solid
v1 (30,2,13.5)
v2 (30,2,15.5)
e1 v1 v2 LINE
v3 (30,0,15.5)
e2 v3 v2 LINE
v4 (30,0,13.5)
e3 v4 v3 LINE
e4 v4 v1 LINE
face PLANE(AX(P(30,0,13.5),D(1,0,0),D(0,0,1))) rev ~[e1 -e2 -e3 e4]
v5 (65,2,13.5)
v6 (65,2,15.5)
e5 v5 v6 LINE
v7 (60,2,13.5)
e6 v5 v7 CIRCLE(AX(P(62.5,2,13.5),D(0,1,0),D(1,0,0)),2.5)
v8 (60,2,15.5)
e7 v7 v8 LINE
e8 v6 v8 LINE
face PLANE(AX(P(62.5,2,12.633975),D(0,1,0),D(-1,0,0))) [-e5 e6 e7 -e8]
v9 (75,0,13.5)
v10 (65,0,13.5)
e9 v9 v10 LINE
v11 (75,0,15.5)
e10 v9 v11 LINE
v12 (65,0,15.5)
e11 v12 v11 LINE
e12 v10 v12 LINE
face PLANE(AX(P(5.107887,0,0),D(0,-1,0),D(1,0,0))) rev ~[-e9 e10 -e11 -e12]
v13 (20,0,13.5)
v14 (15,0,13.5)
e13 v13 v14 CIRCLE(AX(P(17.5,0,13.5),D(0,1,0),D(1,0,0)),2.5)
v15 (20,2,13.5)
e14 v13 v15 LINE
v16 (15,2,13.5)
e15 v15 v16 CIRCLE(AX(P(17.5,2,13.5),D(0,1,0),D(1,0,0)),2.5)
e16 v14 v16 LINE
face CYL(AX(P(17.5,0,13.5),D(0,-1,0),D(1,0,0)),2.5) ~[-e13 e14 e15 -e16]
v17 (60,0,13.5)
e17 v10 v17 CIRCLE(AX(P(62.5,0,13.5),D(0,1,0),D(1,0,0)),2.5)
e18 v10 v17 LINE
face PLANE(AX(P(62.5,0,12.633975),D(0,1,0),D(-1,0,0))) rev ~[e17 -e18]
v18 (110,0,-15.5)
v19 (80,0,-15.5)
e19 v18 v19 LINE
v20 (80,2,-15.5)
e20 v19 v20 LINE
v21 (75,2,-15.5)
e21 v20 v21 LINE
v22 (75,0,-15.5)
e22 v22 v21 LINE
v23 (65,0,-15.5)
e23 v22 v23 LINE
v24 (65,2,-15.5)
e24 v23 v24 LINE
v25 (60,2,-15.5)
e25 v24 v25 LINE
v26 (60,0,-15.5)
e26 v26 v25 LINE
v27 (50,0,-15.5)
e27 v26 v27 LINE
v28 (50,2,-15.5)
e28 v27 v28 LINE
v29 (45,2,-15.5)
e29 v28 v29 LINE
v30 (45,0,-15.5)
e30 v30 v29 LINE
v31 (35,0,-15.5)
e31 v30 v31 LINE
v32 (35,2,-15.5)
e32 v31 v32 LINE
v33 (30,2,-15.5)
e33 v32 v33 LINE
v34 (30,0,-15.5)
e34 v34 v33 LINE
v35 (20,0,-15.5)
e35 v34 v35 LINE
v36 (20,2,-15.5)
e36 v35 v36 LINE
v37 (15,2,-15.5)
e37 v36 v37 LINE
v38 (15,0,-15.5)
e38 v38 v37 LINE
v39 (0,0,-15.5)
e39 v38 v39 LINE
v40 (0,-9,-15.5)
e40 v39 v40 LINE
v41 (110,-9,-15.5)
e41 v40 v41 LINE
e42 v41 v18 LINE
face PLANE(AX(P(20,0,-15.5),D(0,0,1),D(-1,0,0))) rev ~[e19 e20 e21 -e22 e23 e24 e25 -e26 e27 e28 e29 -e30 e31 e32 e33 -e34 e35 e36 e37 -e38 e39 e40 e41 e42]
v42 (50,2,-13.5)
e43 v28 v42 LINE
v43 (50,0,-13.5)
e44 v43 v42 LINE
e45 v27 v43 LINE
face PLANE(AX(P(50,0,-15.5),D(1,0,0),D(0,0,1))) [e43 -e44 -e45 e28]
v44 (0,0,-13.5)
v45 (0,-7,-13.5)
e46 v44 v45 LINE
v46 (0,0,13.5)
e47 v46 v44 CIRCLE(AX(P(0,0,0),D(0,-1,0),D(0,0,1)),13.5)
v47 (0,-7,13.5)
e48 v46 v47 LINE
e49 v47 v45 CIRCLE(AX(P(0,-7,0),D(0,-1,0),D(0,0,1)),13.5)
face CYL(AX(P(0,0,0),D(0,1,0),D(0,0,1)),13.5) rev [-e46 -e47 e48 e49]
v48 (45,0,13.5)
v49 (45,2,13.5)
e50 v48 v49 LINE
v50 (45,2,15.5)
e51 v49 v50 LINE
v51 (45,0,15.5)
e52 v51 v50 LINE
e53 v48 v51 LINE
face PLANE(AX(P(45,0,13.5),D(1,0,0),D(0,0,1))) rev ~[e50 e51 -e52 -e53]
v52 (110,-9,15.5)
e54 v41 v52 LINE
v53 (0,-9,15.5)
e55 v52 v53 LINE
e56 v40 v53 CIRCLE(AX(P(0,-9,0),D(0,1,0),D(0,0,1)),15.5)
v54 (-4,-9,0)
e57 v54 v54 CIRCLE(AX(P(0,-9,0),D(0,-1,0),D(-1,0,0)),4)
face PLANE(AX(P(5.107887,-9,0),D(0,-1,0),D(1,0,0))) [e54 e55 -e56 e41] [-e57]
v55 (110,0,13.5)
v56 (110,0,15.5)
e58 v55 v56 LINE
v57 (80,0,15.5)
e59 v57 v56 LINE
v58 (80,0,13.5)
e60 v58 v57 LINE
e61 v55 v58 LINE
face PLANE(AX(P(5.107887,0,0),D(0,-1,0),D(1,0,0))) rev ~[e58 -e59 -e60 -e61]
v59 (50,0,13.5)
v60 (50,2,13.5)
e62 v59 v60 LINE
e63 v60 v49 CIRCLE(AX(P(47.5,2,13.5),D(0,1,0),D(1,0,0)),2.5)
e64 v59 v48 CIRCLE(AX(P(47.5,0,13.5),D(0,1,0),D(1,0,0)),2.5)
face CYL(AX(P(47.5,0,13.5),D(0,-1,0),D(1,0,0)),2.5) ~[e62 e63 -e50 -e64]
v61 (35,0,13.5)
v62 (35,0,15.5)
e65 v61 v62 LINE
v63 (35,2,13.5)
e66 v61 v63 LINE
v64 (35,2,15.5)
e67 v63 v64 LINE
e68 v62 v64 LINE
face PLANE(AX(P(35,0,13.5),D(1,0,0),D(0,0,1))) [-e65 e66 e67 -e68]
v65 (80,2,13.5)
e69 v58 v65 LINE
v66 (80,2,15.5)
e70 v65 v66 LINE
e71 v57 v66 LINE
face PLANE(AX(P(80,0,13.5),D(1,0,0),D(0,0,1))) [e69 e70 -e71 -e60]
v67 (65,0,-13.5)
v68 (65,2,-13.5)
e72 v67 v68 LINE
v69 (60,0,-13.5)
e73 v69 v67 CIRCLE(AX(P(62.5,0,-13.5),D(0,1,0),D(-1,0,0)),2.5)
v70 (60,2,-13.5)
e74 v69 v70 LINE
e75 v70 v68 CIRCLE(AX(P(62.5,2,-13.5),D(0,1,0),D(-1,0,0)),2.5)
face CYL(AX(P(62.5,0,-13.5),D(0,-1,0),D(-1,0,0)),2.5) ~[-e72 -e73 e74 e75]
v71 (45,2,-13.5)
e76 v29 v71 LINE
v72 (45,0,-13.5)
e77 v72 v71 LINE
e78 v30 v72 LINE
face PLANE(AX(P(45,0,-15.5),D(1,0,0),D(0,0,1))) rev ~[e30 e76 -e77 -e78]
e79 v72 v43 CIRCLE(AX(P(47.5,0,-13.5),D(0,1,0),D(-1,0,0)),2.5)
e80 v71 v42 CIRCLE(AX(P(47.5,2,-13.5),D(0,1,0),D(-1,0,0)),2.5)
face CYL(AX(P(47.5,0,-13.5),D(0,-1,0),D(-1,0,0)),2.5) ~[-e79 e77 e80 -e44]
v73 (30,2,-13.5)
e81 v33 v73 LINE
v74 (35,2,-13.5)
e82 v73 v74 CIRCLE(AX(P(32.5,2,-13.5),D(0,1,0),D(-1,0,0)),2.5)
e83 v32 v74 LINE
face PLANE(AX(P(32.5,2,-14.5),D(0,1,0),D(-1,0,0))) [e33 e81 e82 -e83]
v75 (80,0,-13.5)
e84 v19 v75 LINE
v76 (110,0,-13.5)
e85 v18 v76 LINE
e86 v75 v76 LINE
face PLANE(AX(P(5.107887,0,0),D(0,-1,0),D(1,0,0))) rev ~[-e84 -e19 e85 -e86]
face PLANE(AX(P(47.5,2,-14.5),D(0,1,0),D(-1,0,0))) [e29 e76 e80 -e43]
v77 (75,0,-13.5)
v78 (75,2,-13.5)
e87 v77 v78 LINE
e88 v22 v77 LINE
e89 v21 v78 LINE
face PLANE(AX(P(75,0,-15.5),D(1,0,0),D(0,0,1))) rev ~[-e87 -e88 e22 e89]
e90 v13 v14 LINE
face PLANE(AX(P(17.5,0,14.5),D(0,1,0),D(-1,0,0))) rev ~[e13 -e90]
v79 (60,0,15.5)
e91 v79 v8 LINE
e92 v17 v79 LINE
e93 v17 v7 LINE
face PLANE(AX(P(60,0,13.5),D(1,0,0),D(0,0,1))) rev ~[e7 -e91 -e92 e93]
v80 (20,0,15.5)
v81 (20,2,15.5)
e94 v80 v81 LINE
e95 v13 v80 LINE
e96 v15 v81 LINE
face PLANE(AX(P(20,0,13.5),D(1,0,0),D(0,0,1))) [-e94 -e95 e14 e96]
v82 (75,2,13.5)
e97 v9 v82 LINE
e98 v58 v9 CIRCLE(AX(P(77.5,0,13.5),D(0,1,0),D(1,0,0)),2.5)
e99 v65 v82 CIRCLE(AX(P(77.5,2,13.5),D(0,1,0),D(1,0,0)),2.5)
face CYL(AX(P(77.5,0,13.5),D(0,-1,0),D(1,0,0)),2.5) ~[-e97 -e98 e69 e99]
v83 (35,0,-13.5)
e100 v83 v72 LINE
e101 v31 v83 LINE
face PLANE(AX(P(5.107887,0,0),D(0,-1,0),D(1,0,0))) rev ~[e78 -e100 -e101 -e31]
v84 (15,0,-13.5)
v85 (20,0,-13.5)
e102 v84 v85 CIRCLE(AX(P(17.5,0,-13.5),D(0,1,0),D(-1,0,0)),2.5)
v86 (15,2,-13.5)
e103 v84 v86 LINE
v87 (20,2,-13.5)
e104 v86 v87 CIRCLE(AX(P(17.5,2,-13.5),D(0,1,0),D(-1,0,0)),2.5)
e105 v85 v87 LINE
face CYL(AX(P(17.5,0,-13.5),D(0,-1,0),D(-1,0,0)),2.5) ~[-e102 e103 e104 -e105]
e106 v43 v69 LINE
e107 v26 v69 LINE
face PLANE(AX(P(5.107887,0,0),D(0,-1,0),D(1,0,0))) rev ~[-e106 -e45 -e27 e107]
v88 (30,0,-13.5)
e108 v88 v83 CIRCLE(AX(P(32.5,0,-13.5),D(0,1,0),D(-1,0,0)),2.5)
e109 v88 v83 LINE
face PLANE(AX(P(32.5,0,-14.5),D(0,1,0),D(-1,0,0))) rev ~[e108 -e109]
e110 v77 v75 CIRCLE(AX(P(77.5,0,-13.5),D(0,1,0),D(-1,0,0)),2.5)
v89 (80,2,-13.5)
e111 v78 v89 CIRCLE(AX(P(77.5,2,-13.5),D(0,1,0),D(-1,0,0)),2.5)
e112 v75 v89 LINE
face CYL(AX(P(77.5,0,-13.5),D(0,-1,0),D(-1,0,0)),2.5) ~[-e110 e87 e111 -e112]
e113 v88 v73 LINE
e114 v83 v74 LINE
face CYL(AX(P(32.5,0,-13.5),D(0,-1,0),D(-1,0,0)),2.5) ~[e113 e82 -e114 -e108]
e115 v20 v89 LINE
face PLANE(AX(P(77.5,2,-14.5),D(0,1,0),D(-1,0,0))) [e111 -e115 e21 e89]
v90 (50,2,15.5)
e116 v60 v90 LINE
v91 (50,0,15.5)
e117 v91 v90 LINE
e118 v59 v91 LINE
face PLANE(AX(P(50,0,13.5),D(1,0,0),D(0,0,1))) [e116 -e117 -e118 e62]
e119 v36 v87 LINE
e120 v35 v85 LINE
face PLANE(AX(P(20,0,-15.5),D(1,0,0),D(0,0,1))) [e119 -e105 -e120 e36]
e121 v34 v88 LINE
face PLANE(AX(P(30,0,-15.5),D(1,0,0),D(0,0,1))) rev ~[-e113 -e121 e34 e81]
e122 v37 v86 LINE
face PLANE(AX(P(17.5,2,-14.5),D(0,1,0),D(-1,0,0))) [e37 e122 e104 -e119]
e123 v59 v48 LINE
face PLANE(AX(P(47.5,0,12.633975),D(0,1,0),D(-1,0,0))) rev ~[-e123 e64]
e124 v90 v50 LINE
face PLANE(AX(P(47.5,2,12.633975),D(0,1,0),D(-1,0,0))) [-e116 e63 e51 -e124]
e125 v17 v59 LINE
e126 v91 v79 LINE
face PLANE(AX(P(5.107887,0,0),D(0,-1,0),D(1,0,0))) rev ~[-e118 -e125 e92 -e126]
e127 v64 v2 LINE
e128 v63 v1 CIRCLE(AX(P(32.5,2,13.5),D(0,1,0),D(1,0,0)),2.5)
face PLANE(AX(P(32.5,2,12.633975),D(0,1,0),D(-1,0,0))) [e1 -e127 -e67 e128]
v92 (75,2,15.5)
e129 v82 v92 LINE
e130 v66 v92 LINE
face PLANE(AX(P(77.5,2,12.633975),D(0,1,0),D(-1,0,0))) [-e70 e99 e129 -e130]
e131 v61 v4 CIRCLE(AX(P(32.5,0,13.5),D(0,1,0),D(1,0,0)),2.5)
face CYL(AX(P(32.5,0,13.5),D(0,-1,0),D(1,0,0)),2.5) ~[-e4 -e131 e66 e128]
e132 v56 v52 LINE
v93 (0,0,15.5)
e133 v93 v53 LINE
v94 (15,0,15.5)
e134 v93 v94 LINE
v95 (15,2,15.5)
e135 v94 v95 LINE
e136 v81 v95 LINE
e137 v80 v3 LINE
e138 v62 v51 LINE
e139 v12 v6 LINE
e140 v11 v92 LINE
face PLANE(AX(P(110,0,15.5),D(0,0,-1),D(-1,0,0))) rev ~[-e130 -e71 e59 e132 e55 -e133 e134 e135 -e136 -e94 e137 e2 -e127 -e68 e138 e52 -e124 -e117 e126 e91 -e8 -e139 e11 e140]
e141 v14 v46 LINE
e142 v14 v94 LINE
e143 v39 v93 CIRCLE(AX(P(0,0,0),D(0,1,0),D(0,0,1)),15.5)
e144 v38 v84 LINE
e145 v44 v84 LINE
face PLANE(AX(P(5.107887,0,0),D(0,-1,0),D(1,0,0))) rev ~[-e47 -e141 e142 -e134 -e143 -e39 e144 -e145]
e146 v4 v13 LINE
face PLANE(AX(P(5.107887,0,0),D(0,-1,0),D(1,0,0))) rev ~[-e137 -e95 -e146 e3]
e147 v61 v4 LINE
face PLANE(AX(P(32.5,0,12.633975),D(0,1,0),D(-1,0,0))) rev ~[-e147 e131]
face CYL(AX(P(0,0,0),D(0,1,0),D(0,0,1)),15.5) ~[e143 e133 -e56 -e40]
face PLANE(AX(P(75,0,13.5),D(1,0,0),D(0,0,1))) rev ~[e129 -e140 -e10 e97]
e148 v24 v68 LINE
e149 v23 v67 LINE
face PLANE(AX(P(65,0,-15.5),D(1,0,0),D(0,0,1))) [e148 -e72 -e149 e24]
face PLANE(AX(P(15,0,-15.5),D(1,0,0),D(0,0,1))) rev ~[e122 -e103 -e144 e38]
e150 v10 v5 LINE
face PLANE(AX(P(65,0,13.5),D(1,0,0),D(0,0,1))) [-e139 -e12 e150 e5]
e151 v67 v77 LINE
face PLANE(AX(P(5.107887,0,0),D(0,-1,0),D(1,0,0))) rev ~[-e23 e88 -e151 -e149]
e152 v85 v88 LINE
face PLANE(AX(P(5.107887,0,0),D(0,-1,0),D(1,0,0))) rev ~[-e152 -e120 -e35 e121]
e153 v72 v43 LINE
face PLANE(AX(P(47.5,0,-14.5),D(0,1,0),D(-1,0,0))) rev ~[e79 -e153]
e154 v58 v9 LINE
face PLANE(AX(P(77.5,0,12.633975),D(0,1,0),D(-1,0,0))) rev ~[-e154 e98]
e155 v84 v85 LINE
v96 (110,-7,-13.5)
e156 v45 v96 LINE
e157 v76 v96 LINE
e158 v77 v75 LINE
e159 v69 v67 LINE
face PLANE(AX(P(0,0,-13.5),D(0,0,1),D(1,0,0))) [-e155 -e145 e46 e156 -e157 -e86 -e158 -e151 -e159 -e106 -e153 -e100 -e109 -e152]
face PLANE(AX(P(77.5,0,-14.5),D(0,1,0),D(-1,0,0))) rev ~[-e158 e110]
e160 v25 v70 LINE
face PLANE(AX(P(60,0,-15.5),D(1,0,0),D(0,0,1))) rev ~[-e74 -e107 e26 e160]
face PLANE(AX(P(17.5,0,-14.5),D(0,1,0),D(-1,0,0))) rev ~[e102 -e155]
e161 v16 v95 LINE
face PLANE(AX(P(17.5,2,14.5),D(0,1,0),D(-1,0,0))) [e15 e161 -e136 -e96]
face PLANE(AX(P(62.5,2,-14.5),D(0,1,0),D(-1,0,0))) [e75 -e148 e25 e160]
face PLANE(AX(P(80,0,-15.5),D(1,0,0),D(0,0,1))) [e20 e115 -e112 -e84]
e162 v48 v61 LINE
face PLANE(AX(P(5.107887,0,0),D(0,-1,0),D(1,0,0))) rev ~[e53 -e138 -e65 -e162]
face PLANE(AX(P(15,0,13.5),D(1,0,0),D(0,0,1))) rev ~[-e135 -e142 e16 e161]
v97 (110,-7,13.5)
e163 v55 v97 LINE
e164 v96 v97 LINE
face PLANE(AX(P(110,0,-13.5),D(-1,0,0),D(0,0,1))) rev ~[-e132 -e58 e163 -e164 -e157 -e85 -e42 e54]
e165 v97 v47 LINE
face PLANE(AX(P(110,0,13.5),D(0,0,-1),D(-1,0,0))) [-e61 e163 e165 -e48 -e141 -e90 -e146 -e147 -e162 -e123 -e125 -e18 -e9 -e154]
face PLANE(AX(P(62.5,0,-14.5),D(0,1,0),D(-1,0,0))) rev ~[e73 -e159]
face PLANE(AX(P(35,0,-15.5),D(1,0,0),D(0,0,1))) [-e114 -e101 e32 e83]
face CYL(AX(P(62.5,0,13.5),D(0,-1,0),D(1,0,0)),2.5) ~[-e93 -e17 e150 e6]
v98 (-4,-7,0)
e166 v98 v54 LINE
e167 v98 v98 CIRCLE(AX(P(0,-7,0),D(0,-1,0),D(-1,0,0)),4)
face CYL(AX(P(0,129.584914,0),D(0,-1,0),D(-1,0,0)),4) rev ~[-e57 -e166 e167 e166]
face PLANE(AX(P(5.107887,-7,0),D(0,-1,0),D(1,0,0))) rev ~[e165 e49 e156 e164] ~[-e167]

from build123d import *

# Parameters (mm, degrees)
F1_DEPTH = 7
F2_T     = 2
F3_D     = 8
F4_W     = 5
F4_H     = 2
F5_DEPTH = 2


# Not quite as in the source:
# - a feature of the source that left no trace in its solid (it failed there, or was rolled back) is left out


with BuildPart() as f1:
    # F0 (on Front) → F1 (new body)
    with BuildSketch(Plane.XZ):
        with BuildLine():
            ThreePointArc((0, -13.5), (9.545941546, -9.545941546), (13.5, 0))
            ThreePointArc((13.5, 0), (9.545941546, 9.545941546), (0, 13.5))
            Line((0, 13.5), (0, -13.5))
        make_face()
        with BuildLine():
            ThreePointArc((0, 13.5), (9.545941546, 9.545941546), (13.5, 0))
            ThreePointArc((13.5, 0), (9.545941546, -9.545941546), (0, -13.5))
            Line((0, -13.5), (110, -13.5))
            Line((110, -13.5), (110, 13.5))
            Line((110, 13.5), (0, 13.5))
        make_face()
        with BuildLine():
            Line((0, -13.5), (0, 13.5))
            ThreePointArc((0, 13.5), (-13.5, 0), (0, -13.5))
        make_face()
    extrude(amount=F1_DEPTH)

    # F2
    f2_openings = [f1.faces().sort_by_distance(p)[0] for p in [
        (49.660922, 0, 0),
        (110, -3.5, 0),
    ]]
    offset(amount=F2_T, openings=f2_openings, kind=Kind.INTERSECTION)

    # F3 (through all)
    with Locations(Plane(origin=(0, 0, 0), x_dir=(1, 0, 0), z_dir=(0, 1, 0))):
        with Locations((0, 0)):
            Hole(F3_D / 2)

    # F4 (on face) → F5 (join)
    with BuildSketch(Plane(origin=(0, 0, 0), x_dir=(-1, 0, 0), z_dir=(0, 1, 0))):
        with Locations((-17.5, -14.5)):
            Rectangle(F4_W, F4_H)
        with BuildLine():
            Line((-20, -13.5), (-15, -13.5))
            ThreePointArc((-15, -13.5), (-17.5, -11), (-20, -13.5))
        make_face()
        with Locations((-32.5, -14.5)):
            Rectangle(F4_W, F4_H)
        with BuildLine():
            Line((-35, -13.5), (-30, -13.5))
            ThreePointArc((-30, -13.5), (-32.5, -11), (-35, -13.5))
        make_face()
        with Locations((-47.5, -14.5)):
            Rectangle(F4_W, F4_H)
        with BuildLine():
            Line((-50, -13.5), (-45, -13.5))
            ThreePointArc((-45, -13.5), (-47.5, -11), (-50, -13.5))
        make_face()
        with Locations((-62.5, -14.5)):
            Rectangle(F4_W, F4_H)
        with BuildLine():
            Line((-65, -13.5), (-60, -13.5))
            ThreePointArc((-60, -13.5), (-62.5, -11), (-65, -13.5))
        make_face()
        with Locations((-77.5, -14.5)):
            Rectangle(F4_W, F4_H)
        with BuildLine():
            Line((-80, -13.5), (-75, -13.5))
            ThreePointArc((-75, -13.5), (-77.5, -11), (-80, -13.5))
        make_face()
        with Locations((-17.5, 14.5)):
            Rectangle(F4_W, F4_H)
        with BuildLine():
            ThreePointArc((-20, 13.5), (-17.5, 11), (-15, 13.5))
            Line((-15, 13.5), (-20, 13.5))
        make_face()
        with BuildLine():
            ThreePointArc((-35, 13.5), (-32.5, 11), (-30, 13.5))
            Line((-30, 13.5), (-35, 13.5))
        make_face()
        with Locations((-32.5, 14.5)):
            Rectangle(F4_W, F4_H)
        with BuildLine():
            ThreePointArc((-50, 13.5), (-47.5, 11), (-45, 13.5))
            Line((-45, 13.5), (-50, 13.5))
        make_face()
        with Locations((-47.5, 14.5)):
            Rectangle(F4_W, F4_H)
        with BuildLine():
            ThreePointArc((-65, 13.5), (-62.5, 11), (-60, 13.5))
            Line((-60, 13.5), (-65, 13.5))
        make_face()
        with Locations((-62.5, 14.5)):
            Rectangle(F4_W, F4_H)
        with BuildLine():
            ThreePointArc((-80, 13.5), (-77.5, 11), (-75, 13.5))
            Line((-75, 13.5), (-80, 13.5))
        make_face()
        with Locations((-77.5, 14.5)):
            Rectangle(F4_W, F4_H)
    extrude(amount=F5_DEPTH)


solid = f1.part
